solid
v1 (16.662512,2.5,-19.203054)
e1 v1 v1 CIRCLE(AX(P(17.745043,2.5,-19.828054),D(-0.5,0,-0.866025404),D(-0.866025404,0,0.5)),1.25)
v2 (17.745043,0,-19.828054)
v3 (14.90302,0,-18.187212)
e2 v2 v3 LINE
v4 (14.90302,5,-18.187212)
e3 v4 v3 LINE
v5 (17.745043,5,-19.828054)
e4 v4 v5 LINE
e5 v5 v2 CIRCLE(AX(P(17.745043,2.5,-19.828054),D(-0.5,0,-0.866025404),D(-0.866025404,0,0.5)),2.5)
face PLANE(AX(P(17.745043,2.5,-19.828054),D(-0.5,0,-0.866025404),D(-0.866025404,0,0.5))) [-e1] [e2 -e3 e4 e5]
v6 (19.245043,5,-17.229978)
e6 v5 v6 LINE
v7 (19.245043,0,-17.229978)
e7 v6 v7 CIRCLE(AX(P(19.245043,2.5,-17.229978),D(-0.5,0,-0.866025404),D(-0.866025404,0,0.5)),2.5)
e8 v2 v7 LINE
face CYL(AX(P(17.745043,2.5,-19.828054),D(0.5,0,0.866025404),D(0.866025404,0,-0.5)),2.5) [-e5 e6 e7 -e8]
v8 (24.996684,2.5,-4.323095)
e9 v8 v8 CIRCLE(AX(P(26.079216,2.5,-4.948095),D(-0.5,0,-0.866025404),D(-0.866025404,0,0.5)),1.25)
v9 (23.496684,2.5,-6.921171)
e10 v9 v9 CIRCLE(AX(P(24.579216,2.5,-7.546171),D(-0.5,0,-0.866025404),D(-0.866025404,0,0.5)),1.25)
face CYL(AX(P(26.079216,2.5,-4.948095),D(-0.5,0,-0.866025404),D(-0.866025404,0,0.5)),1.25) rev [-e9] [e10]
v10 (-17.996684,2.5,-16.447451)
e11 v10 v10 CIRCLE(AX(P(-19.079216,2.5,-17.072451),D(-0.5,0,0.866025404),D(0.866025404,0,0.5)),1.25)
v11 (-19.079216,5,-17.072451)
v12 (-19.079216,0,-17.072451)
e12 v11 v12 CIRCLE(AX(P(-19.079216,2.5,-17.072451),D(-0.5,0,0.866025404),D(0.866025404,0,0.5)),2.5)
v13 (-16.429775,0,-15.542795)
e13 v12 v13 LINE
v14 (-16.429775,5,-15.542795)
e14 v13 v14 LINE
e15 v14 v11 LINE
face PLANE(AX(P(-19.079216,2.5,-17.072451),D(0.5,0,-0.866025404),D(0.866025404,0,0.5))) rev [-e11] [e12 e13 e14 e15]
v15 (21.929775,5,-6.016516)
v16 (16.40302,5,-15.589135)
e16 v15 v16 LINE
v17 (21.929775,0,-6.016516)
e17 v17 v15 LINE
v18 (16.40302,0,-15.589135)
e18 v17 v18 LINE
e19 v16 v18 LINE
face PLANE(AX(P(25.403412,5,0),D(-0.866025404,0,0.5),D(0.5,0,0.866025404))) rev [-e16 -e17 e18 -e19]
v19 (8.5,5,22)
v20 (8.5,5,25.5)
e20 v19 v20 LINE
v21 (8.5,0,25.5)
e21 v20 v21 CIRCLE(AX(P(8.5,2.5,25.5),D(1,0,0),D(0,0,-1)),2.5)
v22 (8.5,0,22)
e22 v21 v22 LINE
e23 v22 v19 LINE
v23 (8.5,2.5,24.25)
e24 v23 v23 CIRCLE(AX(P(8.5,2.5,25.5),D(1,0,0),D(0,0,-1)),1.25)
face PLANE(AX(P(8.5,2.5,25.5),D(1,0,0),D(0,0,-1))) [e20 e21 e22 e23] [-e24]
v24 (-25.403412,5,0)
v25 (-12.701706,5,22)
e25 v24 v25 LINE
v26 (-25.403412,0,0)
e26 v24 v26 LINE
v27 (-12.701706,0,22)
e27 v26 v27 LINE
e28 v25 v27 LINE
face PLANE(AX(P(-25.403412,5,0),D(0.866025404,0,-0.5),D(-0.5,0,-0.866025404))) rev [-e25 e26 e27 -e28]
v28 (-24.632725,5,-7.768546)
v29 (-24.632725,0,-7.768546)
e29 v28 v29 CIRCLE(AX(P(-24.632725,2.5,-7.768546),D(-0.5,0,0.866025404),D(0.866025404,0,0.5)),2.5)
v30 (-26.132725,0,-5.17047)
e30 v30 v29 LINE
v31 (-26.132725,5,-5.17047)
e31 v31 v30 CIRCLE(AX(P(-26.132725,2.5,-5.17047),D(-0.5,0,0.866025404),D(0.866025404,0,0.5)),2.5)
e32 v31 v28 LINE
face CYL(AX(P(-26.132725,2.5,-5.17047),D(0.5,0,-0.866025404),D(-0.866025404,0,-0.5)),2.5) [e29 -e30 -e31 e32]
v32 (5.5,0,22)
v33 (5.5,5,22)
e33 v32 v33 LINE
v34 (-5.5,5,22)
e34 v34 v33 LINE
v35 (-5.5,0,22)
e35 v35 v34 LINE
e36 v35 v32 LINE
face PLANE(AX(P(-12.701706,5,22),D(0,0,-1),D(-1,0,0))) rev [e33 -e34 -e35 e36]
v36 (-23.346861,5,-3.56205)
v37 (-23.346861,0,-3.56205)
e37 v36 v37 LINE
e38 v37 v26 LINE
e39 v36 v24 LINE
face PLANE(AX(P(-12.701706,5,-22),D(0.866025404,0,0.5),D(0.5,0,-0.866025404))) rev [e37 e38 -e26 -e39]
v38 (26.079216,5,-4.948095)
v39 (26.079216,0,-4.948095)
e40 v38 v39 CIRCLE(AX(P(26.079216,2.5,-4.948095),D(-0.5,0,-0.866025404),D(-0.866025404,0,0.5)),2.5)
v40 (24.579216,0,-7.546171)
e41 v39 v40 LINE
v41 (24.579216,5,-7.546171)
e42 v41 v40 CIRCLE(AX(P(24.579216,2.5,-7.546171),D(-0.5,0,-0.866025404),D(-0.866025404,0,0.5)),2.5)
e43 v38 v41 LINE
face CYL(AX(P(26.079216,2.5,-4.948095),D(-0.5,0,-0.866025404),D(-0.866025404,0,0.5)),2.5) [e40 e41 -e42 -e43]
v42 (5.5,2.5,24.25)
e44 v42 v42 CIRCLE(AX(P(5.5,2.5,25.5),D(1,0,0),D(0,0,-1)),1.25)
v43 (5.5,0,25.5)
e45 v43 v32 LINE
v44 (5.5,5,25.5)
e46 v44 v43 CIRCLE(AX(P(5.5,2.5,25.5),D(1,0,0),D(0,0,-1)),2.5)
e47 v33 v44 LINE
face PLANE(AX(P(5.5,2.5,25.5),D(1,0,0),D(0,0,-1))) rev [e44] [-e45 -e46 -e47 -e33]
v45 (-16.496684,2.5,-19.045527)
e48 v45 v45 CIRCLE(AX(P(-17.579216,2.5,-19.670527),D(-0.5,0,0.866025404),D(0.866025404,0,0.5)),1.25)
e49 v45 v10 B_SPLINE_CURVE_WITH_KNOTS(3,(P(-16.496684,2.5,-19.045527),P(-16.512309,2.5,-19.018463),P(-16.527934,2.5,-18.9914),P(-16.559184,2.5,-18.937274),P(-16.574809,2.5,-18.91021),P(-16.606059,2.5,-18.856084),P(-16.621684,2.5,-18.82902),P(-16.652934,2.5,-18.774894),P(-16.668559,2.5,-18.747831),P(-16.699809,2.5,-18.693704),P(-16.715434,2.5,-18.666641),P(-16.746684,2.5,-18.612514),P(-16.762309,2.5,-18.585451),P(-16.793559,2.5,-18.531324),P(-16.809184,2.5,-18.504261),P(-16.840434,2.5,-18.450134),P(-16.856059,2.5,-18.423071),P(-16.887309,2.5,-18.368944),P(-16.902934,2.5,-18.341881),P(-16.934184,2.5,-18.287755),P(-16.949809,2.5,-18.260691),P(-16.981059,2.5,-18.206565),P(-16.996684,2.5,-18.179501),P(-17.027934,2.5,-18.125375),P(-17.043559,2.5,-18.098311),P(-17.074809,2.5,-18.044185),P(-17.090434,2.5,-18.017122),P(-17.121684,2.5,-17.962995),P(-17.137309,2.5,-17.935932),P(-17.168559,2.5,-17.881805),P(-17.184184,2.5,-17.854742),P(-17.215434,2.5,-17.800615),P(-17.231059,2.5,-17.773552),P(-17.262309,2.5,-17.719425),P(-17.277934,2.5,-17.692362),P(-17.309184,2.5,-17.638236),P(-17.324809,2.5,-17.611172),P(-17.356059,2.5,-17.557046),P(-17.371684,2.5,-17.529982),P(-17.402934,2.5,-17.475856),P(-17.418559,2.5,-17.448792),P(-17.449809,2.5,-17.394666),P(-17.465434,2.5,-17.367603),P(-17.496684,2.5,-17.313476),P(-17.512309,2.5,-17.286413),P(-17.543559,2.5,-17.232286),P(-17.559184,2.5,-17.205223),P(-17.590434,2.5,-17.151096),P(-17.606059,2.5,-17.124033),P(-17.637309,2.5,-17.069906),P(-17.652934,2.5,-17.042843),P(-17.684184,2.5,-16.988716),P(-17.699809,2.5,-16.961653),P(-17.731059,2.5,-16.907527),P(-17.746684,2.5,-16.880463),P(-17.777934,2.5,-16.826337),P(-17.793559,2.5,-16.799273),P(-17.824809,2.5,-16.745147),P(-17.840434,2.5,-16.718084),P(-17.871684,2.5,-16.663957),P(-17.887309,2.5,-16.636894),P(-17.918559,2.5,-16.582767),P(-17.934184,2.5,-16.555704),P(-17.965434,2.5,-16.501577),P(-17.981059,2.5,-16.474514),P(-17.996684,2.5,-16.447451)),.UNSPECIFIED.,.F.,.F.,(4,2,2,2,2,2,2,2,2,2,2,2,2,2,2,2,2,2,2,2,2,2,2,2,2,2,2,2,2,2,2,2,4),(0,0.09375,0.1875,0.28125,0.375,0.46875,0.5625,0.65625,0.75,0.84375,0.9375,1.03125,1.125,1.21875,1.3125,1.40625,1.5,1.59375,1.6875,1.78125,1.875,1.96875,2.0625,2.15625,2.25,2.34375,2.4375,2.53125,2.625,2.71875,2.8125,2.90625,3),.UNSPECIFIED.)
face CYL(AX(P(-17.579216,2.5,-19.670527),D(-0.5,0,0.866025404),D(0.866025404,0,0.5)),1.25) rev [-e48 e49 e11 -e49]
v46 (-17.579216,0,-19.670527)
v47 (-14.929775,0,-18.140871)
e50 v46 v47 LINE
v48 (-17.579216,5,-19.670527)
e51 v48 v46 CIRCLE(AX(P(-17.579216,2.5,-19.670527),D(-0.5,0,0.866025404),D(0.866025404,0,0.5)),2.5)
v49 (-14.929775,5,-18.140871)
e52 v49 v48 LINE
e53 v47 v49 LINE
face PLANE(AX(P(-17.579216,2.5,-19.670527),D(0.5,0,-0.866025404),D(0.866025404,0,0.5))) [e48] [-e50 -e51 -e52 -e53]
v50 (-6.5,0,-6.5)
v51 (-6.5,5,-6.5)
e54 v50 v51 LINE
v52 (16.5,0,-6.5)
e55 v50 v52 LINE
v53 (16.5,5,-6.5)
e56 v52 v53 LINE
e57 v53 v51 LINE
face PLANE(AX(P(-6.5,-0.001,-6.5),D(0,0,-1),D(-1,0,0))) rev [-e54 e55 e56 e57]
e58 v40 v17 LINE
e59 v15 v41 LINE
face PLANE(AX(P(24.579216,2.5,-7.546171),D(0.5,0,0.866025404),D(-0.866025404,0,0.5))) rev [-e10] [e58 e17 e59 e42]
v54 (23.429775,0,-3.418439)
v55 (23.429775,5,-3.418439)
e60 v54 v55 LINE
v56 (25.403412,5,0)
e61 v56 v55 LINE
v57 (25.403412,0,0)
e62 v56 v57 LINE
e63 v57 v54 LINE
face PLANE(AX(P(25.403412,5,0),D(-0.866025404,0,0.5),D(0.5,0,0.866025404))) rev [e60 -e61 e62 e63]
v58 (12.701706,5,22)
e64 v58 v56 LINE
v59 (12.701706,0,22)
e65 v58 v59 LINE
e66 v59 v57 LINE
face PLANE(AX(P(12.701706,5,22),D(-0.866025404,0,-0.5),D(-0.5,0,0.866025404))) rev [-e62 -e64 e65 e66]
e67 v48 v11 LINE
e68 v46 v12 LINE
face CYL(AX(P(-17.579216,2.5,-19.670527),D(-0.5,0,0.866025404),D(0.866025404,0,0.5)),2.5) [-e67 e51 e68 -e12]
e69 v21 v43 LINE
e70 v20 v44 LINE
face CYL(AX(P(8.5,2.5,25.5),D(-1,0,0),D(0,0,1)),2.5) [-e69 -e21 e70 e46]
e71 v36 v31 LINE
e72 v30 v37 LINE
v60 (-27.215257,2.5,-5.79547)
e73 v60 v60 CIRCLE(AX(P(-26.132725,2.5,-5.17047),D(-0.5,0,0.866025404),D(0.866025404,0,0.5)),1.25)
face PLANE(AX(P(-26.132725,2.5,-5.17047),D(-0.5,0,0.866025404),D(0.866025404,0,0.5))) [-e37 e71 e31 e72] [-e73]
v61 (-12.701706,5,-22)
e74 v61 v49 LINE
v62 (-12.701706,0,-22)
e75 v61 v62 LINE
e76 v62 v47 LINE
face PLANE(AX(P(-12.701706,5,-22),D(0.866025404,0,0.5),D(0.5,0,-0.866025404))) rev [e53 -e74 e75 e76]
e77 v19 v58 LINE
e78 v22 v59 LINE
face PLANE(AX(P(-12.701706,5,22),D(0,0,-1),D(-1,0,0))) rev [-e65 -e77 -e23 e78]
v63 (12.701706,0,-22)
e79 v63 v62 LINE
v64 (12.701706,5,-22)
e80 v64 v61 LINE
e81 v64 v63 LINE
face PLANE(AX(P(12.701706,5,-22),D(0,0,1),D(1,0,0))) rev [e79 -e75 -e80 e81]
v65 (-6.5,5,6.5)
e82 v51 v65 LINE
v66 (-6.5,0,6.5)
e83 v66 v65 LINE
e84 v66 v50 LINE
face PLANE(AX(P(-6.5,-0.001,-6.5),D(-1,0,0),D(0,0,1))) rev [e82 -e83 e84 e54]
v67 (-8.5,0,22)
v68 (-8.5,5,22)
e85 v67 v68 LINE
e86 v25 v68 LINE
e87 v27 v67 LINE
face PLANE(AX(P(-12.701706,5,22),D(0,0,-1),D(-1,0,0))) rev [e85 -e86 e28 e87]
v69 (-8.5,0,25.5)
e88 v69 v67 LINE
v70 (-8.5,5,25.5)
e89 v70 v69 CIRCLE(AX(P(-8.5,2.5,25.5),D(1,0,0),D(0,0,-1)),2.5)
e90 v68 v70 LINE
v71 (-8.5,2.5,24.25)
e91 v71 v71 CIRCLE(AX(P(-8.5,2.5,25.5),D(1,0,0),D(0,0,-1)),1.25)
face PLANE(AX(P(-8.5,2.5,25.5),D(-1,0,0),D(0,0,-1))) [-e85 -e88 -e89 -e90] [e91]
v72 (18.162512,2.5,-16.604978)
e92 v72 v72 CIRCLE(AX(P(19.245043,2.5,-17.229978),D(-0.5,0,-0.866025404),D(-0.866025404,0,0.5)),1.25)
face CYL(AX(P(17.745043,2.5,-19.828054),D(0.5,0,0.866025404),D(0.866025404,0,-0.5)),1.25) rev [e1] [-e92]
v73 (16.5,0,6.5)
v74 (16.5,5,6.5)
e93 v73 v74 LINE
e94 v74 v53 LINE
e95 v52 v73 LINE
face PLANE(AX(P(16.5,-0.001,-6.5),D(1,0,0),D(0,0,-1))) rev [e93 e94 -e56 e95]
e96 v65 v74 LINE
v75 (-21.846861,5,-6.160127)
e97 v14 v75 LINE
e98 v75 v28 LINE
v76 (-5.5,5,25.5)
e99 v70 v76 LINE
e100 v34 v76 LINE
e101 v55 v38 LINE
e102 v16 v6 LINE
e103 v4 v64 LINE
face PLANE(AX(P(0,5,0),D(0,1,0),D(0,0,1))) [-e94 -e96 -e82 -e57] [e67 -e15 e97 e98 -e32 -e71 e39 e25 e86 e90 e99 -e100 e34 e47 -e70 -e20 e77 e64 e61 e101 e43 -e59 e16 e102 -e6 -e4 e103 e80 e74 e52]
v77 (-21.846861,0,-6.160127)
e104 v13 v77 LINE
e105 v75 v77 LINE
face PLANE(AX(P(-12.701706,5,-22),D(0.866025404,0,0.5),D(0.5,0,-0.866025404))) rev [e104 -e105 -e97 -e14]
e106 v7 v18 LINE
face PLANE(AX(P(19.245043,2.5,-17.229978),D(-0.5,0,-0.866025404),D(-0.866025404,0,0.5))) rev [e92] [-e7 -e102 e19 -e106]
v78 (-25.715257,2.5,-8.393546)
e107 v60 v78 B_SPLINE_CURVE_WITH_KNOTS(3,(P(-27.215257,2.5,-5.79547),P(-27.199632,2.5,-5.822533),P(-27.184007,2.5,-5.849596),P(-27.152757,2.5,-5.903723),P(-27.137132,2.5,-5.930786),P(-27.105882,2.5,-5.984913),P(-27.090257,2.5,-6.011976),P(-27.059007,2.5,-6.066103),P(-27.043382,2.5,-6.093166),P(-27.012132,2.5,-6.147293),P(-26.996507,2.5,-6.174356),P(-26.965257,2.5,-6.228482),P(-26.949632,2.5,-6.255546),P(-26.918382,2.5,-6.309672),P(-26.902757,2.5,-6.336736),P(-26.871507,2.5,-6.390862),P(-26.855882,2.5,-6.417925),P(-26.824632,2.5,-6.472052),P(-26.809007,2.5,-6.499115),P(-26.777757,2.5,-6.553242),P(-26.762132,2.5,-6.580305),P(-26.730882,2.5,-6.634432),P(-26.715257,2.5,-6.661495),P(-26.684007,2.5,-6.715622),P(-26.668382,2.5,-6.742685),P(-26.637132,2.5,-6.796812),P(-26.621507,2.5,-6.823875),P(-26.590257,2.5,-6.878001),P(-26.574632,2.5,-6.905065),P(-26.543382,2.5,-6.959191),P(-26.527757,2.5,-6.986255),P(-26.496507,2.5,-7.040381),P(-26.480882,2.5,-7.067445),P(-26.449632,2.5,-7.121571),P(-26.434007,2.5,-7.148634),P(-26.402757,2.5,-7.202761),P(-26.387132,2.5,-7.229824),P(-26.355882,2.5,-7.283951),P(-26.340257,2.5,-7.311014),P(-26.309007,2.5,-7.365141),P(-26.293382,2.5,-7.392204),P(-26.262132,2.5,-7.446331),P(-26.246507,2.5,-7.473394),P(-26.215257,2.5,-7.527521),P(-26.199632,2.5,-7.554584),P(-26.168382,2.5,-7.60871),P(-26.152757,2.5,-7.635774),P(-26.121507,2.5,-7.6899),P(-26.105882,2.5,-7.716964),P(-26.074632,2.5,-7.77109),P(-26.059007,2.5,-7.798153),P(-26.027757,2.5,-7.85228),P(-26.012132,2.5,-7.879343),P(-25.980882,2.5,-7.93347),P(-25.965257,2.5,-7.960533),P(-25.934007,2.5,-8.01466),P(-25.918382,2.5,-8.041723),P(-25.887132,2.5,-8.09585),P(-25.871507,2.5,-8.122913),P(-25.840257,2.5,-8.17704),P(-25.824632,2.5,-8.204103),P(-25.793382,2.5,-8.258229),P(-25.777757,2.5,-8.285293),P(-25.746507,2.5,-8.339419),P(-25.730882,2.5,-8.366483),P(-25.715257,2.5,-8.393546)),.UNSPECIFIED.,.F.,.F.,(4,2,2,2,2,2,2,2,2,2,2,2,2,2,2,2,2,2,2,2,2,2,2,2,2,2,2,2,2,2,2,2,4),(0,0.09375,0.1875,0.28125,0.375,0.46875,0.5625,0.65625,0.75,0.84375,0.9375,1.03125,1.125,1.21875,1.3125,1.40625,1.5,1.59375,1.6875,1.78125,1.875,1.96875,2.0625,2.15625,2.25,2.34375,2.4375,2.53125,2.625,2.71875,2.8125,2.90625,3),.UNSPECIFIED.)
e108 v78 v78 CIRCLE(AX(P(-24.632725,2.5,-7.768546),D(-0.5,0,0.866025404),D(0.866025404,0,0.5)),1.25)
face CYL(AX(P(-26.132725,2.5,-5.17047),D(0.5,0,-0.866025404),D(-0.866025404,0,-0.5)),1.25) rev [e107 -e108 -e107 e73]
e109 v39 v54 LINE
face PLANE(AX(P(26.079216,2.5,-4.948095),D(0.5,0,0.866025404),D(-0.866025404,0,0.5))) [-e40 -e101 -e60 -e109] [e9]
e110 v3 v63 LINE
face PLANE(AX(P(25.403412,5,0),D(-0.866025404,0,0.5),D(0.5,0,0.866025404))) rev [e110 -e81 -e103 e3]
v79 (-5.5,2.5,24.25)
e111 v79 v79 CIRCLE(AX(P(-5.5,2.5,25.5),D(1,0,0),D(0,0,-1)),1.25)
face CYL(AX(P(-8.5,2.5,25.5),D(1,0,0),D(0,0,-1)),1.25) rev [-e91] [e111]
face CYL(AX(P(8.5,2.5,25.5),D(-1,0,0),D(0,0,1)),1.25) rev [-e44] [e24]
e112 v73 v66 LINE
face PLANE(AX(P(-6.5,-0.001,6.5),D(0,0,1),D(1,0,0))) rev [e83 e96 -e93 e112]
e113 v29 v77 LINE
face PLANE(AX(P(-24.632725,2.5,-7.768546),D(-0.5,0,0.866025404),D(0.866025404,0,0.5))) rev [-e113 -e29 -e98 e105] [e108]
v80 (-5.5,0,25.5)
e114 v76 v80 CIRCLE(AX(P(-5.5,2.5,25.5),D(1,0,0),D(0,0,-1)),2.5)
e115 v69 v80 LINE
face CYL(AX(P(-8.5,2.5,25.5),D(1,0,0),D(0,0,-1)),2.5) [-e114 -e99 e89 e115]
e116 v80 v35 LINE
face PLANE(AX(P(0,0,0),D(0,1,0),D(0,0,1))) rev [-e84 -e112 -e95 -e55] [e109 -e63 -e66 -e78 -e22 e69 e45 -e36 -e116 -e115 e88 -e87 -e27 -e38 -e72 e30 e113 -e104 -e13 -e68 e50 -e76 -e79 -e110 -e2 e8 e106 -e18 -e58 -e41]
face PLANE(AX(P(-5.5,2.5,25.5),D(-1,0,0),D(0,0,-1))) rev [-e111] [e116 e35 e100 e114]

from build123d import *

# Parameters (mm, degrees)
BOSS_EXTRUDE1_DEPTH     = 5
BOSS_EXTRUDE2_START     = 5.5
SKETCH2_R               = 1.25
BOSS_EXTRUDE2_DEPTH     = 3
CIRPATTERN1_START       = -8.29907709
CIRPATTERN1_OUTLINE_R   = 1.25
CIRPATTERN1_DEPTH       = 3
CIRPATTERN1_START_2     = 5.754432
CIRPATTERN1_2_OUTLINE_R = 1.25
CIRPATTERN1_2_DEPTH     = 3
CIRPATTERN1_START_3     = -8.588604314
CIRPATTERN1_3_OUTLINE_R = 1.25
CIRPATTERN1_3_DEPTH     = 3
CIRPATTERN1_START_4     = 5.245568
CIRPATTERN1_4_OUTLINE_R = 1.25
CIRPATTERN1_4_DEPTH     = 3
CUT_EXTRUDE1_REACH      = 42.122
SKETCH3_W               = 23
SKETCH3_H               = 13


# Read off the part's stored shape, not the designer's step: CirPattern1
with BuildPart() as part:
    # Sketch1 → Boss-Extrude1 (new body)
    with BuildSketch(Plane(origin=(0, 0, 0), x_dir=(1, 0, 0), z_dir=(0, 1, 0))):
        Polygon((25.403411844, 0), (12.701705922, 22), (-12.701705922, 22), (-25.403411844, 0), (-12.701705922, -22), (12.701705922, -22), align=None)
    extrude(amount=BOSS_EXTRUDE1_DEPTH)

    # Sketch2 → Boss-Extrude2 (add)
    with BuildSketch(Plane(origin=(0, 0, 0), x_dir=(0, 0, -1), z_dir=(1, 0, 0)).offset(BOSS_EXTRUDE2_START)):
        with BuildLine():
            Line((-22, 5), (-25.5, 5))
            ThreePointArc((-25.5, 5), (-28, 2.5), (-25.5, 0))
            Line((-25.5, 0), (-22, 0))
            Line((-22, 0), (-22, 5))
        make_face()
        with Locations((-25.5, 2.5)):
            Circle(SKETCH2_R, mode=Mode.SUBTRACT)
    boss_extrude2 = extrude(amount=BOSS_EXTRUDE2_DEPTH)

    # Mirror1: Boss-Extrude2 across plane
    add(boss_extrude2.mirror(Plane(origin=(0, 0, 0), x_dir=(0, 0, 1), z_dir=(1, 0, 0))))

    # CirPattern1 outline → CirPattern1 (add)
    with BuildSketch(Plane(origin=(0, 0, 0), x_dir=(0.8660254037844362, 0, -0.5000000000000042), z_dir=(0.5000000000000042, 0, 0.8660254037844363)).offset(CIRPATTERN1_START)):
        with BuildLine():
            Line((25.281685655, 5), (22, 5))
            Line((22, 5), (22, 0))
            Line((22, 0), (25.281685655, 0))
            ThreePointArc((25.281685655, 0), (27.781685655, 2.5), (25.281685655, 5))
        make_face()
        with Locations((25.281685655, 2.5)):
            Circle(CIRPATTERN1_OUTLINE_R, mode=Mode.SUBTRACT)
    extrude(amount=CIRPATTERN1_DEPTH)

    # CirPattern1 2 outline → CirPattern1 2 (add)
    with BuildSketch(Plane(origin=(0, 0, 0), x_dir=(0.8660254037844362, 0, -0.5000000000000042), z_dir=(0.5000000000000042, 0, 0.8660254037844363)).offset(CIRPATTERN1_START_2)):
        with BuildLine():
            ThreePointArc((25.059310849, 0), (27.559310849, 2.5), (25.059310849, 5))
            Line((25.059310849, 5), (22, 5))
            Line((22, 5), (22, 0))
            Line((22, 0), (25.059310849, 0))
        make_face()
        with Locations((25.059310849, 2.5)):
            Circle(CIRPATTERN1_2_OUTLINE_R, mode=Mode.SUBTRACT)
    extrude(amount=CIRPATTERN1_2_DEPTH)

    # CirPattern1 3 outline → CirPattern1 3 (add)
    with BuildSketch(Plane(origin=(0, 0, 0), x_dir=(0.8660254037844431, 0, 0.4999999999999921), z_dir=(0.4999999999999921, 0, -0.8660254037844433)).offset(CIRPATTERN1_START_3)):
        with BuildLine():
            Line((-25.216838483, -5), (-22, -5))
            Line((-22, -5), (-22, 0))
            Line((-22, 0), (-25.216838483, 0))
            ThreePointArc((-25.216838483, 0), (-27.716838483, -2.5), (-25.216838483, -5))
        make_face()
        with Locations((-25.216838483, -2.5)):
            Circle(CIRPATTERN1_3_OUTLINE_R, mode=Mode.SUBTRACT)
    extrude(amount=CIRPATTERN1_3_DEPTH)

    # CirPattern1 4 outline → CirPattern1 4 (add)
    with BuildSketch(Plane(origin=(0, 0, 0), x_dir=(0.8660254037844431, 0, 0.4999999999999921), z_dir=(0.4999999999999921, 0, -0.8660254037844433)).offset(CIRPATTERN1_START_4)):
        with BuildLine():
            ThreePointArc((-25.059310849, 0), (-27.559310849, -2.5), (-25.059310849, -5))
            Line((-25.059310849, -5), (-22, -5))
            Line((-22, -5), (-22, 0))
            Line((-22, 0), (-25.059310849, 0))
        make_face()
        with Locations((-25.059310849, -2.5)):
            Circle(CIRPATTERN1_4_OUTLINE_R, mode=Mode.SUBTRACT)
    extrude(amount=CIRPATTERN1_4_DEPTH)

    # Sketch3 → Cut-Extrude1 (cut, up to next)
    with BuildSketch(Plane(origin=(0, 5, 0), x_dir=(1, 0, 0), z_dir=(0, 1, 0)), mode=Mode.PRIVATE) as cut_extrude1_sk1:
        with Locations((5, 0)):
            Rectangle(SKETCH3_W, SKETCH3_H)
    cut_extrude1_tool1 = extrude(cut_extrude1_sk1.sketch, amount=-CUT_EXTRUDE1_REACH, mode=Mode.PRIVATE) & part.part
    add(cut_extrude1_tool1.solids().sort_by_distance((5, 5, 0))[0], mode=Mode.SUBTRACT)


solid = part.part
